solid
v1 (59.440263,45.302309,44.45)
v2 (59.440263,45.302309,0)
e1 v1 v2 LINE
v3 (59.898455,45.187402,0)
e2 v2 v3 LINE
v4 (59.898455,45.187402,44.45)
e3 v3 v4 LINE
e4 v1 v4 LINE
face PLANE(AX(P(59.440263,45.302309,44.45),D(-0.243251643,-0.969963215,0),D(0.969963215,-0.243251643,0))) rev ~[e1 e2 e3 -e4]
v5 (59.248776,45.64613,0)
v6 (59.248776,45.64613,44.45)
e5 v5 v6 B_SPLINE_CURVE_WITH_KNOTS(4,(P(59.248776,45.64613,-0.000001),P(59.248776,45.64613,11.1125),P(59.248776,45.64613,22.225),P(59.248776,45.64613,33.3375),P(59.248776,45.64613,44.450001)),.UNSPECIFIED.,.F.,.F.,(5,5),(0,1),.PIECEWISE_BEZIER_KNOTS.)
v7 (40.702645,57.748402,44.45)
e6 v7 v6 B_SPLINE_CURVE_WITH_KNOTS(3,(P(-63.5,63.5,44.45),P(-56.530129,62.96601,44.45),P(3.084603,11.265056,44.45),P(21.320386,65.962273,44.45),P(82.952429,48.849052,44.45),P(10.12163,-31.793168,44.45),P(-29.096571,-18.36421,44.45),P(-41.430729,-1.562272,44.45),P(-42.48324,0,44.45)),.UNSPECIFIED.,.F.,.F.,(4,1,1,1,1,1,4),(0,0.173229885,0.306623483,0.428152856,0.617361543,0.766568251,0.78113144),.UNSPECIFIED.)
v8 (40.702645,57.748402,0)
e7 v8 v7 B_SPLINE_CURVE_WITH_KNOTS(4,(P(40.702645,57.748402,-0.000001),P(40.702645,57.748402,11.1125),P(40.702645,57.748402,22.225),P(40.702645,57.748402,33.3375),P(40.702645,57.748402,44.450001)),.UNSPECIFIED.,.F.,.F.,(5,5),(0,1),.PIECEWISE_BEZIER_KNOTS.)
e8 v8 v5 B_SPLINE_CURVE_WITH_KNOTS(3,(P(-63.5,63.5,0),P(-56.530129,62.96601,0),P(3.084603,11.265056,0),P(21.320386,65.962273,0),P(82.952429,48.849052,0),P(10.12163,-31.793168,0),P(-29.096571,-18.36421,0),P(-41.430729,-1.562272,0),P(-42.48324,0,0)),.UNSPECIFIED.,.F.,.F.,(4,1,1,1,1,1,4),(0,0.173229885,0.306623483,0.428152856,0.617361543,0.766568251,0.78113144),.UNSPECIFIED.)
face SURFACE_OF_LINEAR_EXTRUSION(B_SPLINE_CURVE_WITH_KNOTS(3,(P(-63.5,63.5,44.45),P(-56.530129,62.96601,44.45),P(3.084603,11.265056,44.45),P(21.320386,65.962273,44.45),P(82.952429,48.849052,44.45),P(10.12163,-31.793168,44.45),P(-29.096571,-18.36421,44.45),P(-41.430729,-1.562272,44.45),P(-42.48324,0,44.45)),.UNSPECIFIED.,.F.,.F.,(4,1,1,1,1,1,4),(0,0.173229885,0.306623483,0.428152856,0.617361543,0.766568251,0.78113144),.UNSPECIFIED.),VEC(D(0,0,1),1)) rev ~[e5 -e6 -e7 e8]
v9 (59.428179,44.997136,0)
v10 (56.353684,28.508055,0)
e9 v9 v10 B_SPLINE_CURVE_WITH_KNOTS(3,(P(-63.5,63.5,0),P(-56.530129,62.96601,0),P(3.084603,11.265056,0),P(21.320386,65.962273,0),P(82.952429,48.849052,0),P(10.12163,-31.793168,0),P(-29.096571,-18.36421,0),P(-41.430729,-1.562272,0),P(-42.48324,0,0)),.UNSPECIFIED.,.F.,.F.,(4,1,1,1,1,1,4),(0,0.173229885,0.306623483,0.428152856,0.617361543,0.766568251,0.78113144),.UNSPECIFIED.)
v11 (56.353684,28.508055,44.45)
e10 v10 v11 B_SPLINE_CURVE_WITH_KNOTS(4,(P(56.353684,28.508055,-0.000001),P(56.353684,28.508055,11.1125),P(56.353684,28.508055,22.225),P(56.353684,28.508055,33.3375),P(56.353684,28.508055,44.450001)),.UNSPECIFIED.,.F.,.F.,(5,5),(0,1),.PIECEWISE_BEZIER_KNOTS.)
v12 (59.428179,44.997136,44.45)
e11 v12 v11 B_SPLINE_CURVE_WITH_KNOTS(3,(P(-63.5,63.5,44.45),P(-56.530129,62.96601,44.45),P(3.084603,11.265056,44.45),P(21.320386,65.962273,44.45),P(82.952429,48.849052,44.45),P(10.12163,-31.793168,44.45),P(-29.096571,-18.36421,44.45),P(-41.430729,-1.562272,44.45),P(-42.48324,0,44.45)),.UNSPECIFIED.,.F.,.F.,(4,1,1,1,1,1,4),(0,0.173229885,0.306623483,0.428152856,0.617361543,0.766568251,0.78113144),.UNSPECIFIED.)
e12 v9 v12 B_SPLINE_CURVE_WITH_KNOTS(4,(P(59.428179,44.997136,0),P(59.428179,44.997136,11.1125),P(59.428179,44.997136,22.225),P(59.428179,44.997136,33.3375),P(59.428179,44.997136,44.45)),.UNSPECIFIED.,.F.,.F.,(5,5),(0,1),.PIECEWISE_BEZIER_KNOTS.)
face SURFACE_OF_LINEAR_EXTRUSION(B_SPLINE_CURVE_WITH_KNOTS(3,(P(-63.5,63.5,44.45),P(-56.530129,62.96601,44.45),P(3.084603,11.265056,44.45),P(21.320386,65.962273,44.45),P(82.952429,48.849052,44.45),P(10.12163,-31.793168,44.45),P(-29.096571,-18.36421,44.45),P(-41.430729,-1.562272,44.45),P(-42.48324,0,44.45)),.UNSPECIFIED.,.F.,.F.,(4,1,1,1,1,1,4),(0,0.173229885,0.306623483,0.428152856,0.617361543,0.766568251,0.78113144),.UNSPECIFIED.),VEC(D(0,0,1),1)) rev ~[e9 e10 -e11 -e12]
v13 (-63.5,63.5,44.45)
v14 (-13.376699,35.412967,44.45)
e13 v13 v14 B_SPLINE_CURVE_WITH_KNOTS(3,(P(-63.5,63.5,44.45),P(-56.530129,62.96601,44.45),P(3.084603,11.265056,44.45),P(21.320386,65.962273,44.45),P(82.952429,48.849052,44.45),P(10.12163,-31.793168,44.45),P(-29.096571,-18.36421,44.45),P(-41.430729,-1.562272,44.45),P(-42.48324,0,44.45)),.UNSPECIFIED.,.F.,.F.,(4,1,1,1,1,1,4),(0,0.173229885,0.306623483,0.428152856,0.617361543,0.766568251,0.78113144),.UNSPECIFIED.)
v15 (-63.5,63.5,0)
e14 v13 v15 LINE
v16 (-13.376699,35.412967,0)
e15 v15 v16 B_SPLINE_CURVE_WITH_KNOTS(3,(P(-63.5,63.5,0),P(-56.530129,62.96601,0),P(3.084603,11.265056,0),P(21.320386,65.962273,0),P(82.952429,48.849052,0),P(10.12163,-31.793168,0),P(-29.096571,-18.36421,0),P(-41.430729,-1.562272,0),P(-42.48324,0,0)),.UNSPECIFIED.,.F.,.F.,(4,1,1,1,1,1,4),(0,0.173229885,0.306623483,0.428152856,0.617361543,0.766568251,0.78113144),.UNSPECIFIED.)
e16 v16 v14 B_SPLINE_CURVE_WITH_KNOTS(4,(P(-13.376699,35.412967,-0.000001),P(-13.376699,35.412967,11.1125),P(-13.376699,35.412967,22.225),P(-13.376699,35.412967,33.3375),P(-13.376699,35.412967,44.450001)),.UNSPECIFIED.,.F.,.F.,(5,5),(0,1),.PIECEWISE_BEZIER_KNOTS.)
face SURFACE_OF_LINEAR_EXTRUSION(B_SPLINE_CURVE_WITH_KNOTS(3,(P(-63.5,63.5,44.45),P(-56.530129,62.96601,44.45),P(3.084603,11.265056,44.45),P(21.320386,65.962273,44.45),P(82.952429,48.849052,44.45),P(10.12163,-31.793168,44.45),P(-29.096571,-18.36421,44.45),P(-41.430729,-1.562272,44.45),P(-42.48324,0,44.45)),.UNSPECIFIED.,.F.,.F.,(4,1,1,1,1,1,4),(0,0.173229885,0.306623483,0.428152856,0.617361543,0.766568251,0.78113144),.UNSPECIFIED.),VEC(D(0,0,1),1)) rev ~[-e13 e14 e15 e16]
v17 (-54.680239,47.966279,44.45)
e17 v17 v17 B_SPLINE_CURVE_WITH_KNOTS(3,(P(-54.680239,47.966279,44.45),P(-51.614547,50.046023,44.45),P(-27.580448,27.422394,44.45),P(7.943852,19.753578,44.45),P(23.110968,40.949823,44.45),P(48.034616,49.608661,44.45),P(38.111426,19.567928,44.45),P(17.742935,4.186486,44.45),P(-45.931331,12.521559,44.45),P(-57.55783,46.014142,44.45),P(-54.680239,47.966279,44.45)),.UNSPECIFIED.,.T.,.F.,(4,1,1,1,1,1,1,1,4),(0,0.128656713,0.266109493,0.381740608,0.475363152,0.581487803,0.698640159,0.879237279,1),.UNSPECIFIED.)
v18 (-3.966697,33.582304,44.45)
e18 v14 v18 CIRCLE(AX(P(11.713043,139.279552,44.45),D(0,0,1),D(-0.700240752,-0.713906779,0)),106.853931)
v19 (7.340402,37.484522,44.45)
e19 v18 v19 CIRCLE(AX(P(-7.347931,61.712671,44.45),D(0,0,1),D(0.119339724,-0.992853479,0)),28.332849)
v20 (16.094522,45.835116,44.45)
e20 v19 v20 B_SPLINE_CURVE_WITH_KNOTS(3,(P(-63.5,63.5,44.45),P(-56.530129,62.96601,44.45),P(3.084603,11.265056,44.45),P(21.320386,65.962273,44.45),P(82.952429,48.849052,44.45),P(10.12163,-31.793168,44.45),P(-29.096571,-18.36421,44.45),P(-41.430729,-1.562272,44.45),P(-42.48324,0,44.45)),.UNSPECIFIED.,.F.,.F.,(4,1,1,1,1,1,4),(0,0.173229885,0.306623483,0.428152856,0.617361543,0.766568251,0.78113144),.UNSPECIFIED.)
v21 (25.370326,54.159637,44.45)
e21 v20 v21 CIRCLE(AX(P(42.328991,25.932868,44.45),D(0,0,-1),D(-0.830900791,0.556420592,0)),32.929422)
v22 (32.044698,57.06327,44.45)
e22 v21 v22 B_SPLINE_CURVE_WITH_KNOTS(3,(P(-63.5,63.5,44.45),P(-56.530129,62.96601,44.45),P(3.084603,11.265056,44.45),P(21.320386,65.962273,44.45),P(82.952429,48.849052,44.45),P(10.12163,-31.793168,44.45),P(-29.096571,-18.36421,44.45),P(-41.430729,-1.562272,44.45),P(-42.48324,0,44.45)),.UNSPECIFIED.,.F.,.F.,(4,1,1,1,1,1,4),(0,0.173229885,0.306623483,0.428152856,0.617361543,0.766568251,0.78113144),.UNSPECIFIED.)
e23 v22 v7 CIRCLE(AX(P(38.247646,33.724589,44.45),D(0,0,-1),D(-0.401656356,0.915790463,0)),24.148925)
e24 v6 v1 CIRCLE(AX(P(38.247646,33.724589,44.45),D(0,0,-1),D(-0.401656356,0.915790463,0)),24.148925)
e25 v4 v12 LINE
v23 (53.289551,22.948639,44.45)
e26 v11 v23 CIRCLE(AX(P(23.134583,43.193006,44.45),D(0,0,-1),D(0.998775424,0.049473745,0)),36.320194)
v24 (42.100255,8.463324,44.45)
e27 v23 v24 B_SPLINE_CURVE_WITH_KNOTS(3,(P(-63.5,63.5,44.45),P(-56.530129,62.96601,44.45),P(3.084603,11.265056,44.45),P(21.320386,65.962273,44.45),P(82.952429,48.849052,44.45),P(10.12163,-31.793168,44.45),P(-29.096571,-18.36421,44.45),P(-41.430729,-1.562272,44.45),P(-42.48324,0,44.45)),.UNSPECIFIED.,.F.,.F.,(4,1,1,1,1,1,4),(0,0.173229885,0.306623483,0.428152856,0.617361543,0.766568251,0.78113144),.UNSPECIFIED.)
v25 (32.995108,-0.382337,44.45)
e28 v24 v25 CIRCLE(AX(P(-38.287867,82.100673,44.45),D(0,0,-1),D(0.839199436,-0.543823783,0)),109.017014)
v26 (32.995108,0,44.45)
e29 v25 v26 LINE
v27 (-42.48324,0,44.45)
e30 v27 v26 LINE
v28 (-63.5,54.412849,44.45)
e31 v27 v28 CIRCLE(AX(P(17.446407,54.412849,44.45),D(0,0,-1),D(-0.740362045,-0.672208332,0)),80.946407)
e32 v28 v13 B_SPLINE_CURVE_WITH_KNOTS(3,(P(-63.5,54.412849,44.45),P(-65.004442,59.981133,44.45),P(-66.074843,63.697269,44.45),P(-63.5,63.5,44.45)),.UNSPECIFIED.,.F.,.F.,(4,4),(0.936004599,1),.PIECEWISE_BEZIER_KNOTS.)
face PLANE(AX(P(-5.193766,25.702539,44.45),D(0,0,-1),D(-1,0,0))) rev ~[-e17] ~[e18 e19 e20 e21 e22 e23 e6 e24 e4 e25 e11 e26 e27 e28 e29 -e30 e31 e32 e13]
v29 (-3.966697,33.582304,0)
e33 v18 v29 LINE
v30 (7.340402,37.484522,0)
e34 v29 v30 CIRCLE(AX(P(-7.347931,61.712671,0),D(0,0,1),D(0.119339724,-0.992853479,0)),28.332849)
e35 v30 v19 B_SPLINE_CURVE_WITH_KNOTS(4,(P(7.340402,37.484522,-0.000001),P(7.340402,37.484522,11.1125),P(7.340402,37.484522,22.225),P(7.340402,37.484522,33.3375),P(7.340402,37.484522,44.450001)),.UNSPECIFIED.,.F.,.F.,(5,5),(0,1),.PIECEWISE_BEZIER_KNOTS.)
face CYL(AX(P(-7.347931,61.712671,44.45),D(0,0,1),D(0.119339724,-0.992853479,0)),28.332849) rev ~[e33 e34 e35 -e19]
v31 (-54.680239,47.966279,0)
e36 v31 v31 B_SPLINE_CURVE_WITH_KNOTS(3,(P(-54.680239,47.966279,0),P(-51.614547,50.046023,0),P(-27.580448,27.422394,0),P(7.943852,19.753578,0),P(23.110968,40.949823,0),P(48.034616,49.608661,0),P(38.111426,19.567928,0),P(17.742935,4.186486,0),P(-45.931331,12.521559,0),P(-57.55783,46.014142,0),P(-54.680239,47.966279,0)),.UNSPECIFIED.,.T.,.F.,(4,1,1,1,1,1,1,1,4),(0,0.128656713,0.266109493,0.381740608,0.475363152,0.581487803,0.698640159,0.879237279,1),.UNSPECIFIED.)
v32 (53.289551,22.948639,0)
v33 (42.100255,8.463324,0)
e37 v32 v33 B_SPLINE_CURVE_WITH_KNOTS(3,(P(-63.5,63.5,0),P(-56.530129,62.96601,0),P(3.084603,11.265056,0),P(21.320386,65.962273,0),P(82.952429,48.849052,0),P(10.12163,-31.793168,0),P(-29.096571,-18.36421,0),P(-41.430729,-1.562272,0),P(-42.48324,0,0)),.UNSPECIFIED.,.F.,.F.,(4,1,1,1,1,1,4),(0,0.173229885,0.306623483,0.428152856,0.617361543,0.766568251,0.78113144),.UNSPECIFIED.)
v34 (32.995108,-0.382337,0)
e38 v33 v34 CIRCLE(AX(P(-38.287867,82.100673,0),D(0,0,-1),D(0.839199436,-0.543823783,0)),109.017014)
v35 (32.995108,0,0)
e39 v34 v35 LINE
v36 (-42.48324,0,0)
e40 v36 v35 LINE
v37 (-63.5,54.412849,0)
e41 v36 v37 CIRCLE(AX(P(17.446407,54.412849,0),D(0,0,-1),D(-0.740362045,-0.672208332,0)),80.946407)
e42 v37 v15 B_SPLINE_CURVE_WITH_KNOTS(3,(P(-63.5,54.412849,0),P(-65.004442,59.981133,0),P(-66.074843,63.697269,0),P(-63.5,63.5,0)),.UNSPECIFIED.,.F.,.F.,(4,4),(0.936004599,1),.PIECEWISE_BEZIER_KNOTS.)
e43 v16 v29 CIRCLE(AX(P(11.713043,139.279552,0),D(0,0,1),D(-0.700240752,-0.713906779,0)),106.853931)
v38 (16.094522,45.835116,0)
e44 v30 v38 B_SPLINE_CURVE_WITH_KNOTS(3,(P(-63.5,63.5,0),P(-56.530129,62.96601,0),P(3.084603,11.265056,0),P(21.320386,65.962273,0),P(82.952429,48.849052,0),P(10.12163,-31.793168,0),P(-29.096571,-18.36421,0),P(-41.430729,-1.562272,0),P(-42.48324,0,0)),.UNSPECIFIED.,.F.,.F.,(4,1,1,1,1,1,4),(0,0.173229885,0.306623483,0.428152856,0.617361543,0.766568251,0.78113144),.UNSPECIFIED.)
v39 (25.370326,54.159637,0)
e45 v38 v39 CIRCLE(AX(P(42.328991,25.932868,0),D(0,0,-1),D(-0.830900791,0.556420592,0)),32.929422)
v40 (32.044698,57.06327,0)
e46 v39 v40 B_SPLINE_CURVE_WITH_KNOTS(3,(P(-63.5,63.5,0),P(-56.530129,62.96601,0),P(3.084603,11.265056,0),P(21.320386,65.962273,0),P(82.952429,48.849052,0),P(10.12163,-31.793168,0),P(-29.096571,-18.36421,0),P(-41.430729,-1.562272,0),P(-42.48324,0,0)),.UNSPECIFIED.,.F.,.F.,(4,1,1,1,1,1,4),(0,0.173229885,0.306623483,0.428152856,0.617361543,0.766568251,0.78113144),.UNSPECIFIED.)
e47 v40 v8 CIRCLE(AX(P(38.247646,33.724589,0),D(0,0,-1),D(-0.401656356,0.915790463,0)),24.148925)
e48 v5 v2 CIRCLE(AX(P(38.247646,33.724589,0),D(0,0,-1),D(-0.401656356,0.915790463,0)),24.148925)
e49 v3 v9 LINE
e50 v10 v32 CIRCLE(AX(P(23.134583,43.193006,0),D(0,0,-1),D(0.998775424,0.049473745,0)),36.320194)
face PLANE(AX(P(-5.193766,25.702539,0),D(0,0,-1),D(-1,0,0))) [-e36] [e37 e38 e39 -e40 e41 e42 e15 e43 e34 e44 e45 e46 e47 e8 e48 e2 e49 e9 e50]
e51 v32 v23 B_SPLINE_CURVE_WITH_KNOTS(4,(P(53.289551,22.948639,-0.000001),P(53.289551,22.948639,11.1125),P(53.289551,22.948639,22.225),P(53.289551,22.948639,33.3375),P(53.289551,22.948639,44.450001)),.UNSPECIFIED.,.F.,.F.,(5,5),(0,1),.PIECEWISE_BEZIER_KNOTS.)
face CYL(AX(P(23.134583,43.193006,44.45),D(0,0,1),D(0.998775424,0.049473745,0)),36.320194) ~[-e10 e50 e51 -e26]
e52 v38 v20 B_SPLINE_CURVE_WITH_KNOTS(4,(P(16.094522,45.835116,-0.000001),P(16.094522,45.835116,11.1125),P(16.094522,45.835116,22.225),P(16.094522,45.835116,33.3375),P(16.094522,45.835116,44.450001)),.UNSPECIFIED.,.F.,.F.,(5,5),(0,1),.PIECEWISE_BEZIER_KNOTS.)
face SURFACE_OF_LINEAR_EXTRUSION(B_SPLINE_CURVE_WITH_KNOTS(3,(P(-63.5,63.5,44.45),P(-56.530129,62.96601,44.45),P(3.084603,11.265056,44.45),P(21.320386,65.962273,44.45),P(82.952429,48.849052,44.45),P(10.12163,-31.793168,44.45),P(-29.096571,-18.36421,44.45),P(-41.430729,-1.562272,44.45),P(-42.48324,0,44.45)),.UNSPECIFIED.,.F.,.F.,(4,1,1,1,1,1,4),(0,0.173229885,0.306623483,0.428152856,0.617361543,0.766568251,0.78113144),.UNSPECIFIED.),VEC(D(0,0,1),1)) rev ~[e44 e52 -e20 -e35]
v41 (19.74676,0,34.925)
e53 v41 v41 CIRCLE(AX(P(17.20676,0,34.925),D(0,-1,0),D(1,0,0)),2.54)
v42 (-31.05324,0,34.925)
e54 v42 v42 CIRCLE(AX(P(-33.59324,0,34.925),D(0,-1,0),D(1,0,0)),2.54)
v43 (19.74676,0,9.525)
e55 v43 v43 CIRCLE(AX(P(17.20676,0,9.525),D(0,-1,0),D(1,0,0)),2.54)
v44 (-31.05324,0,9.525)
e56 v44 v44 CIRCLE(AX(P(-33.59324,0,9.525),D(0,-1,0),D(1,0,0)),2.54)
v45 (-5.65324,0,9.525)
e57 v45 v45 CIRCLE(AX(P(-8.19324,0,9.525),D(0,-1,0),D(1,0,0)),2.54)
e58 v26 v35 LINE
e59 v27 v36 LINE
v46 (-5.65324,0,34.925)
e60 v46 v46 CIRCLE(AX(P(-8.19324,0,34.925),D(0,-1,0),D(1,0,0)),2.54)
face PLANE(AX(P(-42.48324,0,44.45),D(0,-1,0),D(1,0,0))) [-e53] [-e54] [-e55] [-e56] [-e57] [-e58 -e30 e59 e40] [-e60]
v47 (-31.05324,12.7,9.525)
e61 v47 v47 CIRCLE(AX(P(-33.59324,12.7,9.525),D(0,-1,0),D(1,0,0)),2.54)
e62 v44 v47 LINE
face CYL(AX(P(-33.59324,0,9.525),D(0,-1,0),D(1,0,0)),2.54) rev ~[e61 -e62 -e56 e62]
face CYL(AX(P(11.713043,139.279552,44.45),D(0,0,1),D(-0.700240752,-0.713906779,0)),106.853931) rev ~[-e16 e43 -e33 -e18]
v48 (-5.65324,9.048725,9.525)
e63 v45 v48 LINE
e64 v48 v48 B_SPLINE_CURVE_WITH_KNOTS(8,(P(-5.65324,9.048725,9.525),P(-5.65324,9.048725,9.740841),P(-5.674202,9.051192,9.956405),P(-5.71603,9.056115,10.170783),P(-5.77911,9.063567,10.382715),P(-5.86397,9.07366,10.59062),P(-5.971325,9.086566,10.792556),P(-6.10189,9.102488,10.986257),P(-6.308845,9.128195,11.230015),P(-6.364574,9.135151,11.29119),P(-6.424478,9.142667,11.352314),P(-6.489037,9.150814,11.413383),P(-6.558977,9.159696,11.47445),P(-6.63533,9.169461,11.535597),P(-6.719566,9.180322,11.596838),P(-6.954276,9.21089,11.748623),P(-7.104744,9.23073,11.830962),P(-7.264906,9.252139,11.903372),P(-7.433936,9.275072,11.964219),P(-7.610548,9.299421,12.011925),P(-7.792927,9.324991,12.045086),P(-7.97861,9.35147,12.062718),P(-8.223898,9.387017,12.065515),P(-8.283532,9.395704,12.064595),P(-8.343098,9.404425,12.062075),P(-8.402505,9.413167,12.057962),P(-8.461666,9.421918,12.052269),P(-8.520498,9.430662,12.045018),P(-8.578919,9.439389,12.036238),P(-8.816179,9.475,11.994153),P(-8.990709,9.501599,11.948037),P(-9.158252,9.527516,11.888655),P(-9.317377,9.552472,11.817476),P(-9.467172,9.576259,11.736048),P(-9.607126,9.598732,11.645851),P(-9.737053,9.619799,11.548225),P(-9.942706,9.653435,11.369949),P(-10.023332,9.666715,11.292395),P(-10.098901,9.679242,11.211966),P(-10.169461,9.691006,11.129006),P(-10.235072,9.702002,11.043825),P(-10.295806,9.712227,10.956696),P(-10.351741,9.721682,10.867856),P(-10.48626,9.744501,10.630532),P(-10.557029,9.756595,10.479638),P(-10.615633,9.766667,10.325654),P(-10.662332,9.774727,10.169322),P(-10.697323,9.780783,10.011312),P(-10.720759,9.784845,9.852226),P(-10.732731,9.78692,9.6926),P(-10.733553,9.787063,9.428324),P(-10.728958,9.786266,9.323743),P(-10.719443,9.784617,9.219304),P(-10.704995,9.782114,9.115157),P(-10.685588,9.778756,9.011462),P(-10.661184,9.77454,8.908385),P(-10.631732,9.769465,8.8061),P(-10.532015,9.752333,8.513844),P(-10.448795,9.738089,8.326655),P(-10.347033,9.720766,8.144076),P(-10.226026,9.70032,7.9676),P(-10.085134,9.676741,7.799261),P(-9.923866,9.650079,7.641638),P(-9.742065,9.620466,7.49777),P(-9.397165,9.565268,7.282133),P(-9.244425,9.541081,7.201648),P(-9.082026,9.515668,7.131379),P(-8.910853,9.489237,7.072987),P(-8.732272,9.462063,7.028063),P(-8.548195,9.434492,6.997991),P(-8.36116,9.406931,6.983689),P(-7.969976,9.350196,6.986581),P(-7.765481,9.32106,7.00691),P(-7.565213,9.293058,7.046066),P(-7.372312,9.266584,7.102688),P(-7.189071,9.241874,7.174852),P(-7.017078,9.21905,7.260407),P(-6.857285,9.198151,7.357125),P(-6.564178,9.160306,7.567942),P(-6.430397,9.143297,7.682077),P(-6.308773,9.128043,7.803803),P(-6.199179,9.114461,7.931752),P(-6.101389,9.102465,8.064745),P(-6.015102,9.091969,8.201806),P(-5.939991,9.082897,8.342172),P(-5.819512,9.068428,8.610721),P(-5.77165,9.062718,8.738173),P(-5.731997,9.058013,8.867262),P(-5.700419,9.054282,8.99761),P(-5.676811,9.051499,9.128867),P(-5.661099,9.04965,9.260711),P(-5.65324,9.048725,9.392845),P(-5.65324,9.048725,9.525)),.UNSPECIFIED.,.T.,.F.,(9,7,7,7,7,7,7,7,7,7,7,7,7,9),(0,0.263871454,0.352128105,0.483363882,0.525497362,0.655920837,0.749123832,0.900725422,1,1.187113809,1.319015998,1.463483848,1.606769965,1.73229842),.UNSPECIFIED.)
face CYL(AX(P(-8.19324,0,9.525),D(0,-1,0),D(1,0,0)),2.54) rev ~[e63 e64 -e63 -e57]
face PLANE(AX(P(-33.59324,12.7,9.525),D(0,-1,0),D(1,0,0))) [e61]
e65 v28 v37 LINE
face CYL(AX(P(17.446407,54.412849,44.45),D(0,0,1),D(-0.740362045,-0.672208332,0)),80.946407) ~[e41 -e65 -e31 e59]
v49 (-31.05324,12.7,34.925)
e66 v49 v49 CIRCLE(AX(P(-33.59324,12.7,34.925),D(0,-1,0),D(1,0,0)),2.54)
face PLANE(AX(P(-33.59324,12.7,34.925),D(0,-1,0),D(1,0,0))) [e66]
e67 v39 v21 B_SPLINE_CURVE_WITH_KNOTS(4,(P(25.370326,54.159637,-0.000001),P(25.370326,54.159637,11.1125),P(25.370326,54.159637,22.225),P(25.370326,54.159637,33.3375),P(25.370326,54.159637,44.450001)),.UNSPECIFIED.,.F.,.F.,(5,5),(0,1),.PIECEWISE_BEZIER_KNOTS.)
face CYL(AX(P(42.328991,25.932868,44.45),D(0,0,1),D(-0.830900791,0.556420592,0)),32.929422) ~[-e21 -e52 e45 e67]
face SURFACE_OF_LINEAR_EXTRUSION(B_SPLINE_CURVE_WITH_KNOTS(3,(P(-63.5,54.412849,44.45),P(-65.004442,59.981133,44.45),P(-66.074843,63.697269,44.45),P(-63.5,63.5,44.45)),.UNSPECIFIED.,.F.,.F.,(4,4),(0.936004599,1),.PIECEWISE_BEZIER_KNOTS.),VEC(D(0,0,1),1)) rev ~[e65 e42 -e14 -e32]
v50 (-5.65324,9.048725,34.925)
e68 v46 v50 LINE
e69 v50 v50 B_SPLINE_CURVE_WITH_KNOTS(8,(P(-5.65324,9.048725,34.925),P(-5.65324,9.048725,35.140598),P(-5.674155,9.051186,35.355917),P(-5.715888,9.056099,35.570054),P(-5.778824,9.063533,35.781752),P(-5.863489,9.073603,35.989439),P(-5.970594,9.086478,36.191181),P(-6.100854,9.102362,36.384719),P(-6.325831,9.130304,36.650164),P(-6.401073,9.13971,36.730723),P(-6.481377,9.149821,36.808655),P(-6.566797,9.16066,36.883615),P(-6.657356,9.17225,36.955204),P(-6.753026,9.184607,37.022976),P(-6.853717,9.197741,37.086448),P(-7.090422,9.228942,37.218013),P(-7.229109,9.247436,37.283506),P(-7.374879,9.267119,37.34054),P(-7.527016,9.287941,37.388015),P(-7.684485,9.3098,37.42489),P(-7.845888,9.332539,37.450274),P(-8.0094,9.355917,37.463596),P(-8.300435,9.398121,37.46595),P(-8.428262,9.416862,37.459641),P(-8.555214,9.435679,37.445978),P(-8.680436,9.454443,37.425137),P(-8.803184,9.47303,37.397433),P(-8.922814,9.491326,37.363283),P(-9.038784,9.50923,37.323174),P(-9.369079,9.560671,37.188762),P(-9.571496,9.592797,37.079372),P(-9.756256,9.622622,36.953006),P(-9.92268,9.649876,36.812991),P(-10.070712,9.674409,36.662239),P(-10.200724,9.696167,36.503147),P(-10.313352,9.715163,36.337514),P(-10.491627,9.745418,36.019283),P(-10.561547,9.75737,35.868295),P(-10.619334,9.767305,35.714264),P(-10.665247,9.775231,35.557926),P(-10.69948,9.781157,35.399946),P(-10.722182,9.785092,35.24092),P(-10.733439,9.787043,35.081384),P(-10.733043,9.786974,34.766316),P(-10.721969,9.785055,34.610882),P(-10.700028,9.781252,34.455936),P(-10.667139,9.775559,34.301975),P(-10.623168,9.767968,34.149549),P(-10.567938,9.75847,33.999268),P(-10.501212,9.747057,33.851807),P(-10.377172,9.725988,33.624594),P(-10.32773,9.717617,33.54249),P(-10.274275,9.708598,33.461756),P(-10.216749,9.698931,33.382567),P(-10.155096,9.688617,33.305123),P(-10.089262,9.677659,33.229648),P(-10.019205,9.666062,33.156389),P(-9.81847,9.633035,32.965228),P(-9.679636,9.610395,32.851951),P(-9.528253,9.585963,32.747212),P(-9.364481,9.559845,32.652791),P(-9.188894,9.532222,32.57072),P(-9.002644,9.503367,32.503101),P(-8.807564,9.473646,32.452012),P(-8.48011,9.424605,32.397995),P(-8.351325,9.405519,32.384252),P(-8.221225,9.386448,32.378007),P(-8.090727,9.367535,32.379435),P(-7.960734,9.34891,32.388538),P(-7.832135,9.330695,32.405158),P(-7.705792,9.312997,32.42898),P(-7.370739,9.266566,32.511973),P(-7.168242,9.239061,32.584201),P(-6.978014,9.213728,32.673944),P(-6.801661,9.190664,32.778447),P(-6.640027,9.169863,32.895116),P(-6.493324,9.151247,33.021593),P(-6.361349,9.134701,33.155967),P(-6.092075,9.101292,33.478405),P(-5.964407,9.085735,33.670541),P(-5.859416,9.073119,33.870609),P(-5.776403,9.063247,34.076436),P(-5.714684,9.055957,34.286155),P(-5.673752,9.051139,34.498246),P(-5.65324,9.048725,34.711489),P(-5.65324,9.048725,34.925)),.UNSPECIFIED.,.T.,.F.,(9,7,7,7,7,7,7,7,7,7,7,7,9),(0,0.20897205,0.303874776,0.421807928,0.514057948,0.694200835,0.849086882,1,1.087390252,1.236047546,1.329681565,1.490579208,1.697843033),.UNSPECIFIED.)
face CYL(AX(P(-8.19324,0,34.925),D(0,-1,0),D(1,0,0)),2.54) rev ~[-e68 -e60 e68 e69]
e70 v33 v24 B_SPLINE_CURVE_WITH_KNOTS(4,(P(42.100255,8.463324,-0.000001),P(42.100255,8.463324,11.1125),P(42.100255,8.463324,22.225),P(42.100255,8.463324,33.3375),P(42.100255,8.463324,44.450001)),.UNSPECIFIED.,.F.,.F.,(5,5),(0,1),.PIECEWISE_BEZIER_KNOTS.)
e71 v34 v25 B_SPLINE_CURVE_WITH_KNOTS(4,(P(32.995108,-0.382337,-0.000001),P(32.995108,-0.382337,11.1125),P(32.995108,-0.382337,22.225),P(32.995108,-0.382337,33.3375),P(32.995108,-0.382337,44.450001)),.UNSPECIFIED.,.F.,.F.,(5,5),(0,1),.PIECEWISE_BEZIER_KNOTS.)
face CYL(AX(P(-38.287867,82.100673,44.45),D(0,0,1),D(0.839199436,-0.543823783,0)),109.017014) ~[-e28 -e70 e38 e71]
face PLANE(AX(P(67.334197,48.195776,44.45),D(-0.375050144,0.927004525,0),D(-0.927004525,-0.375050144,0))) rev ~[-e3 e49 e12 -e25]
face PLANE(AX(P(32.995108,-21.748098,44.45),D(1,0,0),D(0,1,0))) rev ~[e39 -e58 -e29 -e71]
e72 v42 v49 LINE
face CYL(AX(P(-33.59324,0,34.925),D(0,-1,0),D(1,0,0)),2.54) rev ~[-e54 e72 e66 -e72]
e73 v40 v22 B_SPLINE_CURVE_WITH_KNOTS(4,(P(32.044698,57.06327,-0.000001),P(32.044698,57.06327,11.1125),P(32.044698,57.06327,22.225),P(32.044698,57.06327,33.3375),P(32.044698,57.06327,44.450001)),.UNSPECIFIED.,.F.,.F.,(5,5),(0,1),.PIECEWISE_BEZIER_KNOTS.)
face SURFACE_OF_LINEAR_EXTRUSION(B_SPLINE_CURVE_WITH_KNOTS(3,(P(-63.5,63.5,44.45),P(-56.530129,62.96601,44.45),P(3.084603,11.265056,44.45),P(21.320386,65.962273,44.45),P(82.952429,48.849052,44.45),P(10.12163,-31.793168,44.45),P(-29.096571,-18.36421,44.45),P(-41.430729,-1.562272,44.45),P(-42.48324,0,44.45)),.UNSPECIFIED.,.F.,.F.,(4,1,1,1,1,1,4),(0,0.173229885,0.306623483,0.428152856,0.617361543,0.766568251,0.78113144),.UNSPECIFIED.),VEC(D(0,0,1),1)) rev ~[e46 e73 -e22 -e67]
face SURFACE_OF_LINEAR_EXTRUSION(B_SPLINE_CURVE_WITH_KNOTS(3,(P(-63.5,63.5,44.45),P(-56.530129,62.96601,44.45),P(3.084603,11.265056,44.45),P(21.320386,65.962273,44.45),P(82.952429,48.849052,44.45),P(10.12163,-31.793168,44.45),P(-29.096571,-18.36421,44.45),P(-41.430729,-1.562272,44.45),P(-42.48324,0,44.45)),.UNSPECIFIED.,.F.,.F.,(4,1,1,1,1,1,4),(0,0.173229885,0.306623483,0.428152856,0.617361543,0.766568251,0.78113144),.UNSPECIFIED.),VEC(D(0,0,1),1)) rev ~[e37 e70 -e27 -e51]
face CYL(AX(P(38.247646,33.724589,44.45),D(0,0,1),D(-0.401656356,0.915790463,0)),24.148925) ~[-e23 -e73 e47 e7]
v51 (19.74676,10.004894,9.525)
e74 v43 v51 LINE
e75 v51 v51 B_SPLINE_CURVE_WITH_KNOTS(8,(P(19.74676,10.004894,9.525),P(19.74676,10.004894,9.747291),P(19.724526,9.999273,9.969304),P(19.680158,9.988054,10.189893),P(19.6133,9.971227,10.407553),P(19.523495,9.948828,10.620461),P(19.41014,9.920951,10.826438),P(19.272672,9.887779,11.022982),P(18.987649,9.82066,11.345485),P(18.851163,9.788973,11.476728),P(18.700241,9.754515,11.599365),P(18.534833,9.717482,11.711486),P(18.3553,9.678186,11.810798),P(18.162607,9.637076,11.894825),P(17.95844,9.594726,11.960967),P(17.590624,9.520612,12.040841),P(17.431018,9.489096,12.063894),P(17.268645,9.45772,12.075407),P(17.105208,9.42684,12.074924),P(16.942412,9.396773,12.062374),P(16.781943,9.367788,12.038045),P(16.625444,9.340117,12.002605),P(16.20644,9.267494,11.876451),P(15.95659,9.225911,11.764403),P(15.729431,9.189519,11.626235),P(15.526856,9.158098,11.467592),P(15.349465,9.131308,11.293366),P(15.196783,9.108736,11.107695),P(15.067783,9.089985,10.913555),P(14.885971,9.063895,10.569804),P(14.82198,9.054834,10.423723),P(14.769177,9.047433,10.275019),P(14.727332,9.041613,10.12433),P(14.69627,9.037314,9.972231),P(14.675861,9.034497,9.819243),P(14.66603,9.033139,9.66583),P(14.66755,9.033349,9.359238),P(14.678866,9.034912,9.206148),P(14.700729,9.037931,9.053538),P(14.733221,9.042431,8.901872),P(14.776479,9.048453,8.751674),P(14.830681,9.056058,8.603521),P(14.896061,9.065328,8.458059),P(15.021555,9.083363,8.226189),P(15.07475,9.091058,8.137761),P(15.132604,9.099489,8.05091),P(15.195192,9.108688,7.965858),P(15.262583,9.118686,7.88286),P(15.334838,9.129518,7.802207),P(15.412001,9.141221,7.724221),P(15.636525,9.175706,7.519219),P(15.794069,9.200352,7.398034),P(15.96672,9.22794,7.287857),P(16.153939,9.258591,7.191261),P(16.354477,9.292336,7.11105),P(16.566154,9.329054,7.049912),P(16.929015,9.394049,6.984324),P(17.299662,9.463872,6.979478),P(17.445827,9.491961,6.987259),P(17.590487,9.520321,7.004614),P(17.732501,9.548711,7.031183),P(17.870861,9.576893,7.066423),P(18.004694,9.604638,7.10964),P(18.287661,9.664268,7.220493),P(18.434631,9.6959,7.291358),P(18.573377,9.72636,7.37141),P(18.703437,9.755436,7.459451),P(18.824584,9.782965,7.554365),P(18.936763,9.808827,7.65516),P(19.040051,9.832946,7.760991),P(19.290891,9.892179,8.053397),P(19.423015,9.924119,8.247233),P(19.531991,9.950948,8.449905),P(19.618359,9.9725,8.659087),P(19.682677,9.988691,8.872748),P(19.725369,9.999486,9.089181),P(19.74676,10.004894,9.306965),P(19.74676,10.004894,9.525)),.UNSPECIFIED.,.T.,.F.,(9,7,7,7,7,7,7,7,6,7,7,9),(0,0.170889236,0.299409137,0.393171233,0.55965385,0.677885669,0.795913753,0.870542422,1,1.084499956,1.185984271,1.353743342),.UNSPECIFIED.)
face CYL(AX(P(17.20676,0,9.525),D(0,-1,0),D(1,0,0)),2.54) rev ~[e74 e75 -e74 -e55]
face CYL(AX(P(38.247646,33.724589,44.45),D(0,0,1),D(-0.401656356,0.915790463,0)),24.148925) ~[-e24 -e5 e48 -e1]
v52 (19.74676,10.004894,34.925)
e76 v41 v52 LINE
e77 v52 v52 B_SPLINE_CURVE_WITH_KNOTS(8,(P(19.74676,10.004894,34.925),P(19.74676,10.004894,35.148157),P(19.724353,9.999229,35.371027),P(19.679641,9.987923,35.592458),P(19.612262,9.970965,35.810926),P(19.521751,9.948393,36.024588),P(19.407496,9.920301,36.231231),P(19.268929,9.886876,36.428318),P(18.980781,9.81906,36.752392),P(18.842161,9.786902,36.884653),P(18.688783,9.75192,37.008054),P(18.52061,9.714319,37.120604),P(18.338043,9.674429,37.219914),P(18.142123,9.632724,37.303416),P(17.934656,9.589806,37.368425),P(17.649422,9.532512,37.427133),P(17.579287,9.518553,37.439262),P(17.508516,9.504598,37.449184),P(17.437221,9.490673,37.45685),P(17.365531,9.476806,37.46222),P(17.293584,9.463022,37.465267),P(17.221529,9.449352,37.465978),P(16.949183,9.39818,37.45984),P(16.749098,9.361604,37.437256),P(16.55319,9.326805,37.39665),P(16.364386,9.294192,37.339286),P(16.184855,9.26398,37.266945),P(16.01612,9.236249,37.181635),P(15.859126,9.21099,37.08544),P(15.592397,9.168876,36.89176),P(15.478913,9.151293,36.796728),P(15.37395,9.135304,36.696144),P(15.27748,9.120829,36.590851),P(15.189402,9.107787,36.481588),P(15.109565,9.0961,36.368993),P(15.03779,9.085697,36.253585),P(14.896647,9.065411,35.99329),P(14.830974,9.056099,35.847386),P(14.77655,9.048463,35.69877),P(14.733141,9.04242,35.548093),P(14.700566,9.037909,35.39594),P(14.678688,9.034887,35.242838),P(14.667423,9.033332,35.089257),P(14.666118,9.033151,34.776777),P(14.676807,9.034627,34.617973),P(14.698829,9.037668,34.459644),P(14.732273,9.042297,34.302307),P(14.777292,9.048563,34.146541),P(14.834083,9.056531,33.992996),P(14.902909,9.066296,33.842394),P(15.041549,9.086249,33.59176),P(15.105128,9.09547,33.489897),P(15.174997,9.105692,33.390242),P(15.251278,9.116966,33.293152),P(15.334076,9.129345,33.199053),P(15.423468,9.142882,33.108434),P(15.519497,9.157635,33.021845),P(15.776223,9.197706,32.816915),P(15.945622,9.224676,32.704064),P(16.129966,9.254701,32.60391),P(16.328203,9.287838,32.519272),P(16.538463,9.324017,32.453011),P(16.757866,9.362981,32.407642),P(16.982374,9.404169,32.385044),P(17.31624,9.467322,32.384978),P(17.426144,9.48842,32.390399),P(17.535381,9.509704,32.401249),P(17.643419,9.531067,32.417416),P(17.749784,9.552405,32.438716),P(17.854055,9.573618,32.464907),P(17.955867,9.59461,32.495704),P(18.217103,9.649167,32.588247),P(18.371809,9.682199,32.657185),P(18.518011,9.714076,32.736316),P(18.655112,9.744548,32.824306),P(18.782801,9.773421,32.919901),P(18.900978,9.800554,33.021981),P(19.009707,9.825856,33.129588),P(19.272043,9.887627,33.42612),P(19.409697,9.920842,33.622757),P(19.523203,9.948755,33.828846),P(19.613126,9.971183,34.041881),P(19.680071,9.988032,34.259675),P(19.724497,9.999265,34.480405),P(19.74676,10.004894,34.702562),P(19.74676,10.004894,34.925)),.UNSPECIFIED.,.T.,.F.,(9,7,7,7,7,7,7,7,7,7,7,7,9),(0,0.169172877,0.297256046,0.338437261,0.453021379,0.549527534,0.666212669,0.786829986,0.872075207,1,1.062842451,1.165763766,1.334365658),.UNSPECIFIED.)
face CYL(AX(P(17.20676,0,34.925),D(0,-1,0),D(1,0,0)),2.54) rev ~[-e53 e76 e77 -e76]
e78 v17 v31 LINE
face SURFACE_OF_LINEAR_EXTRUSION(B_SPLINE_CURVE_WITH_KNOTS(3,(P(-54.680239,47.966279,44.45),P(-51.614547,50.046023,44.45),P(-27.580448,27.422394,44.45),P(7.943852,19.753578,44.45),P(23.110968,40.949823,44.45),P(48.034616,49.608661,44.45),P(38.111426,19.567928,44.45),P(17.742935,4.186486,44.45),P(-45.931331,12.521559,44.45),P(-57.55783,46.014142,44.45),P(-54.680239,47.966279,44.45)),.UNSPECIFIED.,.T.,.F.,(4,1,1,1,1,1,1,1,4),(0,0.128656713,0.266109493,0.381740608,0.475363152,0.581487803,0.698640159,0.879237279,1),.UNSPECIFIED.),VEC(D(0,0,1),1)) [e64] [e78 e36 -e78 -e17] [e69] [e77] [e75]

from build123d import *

# Parameters (mm, degrees)
F0_W      = 127
F0_H      = 127
F1_DEPTH  = 44.45
F3_W      = 5.52829355
F3_H      = 29.727132991
F3_W_2    = 15.5509337783
F3_H_2    = 31.797057949
F3_W_3    = 16.7360811029
F3_H_3    = 5.0730407238
F3_W_4    = 12.5154256821
F3_H_4    = 7.4998177588
F4_DEPTH  = 44.45
F6_DEPTH  = 44.45
F8_DEPTH  = 44.45
F10_DEPTH = 44.45
F11_DEPTH = 44.45
F13_DEPTH = 44.45
F14_W     = 40.5534765481
F14_H     = 44.45
F15_DEPTH = 25.4
F16_W     = 51.4885028824
F16_H     = 44.45
F17_DEPTH = 0.165514648
F18_W     = 20.4539634287
F18_H     = 44.45
F19_DEPTH = 0.5054324865
F20_W     = 63.3779155047
F20_H     = 44.45
F21_DEPTH = 0.1083666682
F22_DEPTH = 44.45
F24_DEPTH = 44.45
F25_W     = 75.4783482299
F25_H     = 21.748097633
F26_DEPTH = 44.45
F27_R     = 2.54
F28_DEPTH = 12.7
F30_DEPTH = 44.45


with BuildPart() as f1:
    # F0 (on Top) → F1 (new body)
    with BuildSketch(Plane.XY):
        Rectangle(F0_W, F0_H)
    extrude(amount=F1_DEPTH)

    # F3 (on face) → F4 (cut, through all)
    with BuildSketch(Plane.XY.offset(44.45)):
        Polygon((-42.7088961005, -20.6194780767), (-42.7088961005, 0), (-57.5702860951, 0), (-63.0985796452, 0), (-63.6439546943, 0), (-63.6439546943, -63.8658776879), (-42.7088961005, -63.8658776879), align=None)
        with Locations((-60.3344328701, 14.8635664955)):
            Rectangle(F3_W, F3_H)
        Polygon((47.7073714137, -20.6194780767), (-42.7088961005, -20.6194780767), (-42.7088961005, -63.8658776879), (63.258305192, -63.8658776879), (63.258305192, -24.8609110713), (63.258305192, -20.6194780767), align=None)
        with Locations((55.4828383029, -4.7209491022)):
            Rectangle(F3_W_2, F3_H_2)
        Polygon((15.835031867, 62.7080500126), (-35.6965474784, 62.7080500126), (-35.6965474784, 49.4633540511), (-20.397156477, 49.4633540511), (8.7539097294, 49.4633540511), (15.835031867, 49.4633540511), align=None)
        Polygon((8.7539097294, 49.4633540511), (-20.397156477, 49.4633540511), (-20.397156477, 42.0814976096), (-13.3289527148, 42.0814976096), (3.4071283881, 42.0814976096), (8.7539097294, 42.0814976096), align=None)
        with Locations((-4.9609121634, 39.5449772477)):
            Rectangle(F3_W_3, F3_H_3)
        with Locations((57.0145174861, 59.6473719925)):
            Rectangle(F3_W_4, F3_H_4)
    extrude(amount=-F4_DEPTH, mode=Mode.SUBTRACT)

    # F5 (on face) → F6 (cut, through all)
    with BuildSketch(Plane.XY.offset(44.45)):
        with BuildLine():
            ThreePointArc((-42.1748310328, 0), (-55.8025308374, 26.5772535751), (-63.3916333318, 55.4644502699))
            Line((-63.3916333318, 55.4644502699), (-63.3916333318, 0))
            Line((-63.3916333318, 0), (-42.1748310328, 0))
        make_face()
    extrude(amount=-F6_DEPTH, mode=Mode.SUBTRACT)

    # F7 (on face) → F8 (cut)
    with BuildSketch(Plane.XY.offset(44.45)):
        with BuildLine():
            ThreePointArc((-27.7672337737, -14.7277772986), (-34.772809099, -9.5105149668), (-40.4422940209, -2.8656031845))
            add(Edge.make_bspline(
                [(-40.4422940209, -2.8656031845), (-41.0425985075, -2.0697804555), (-41.6295465783, -1.2511429317), (-42.203463614, -0.4121370856)],
                knots=[0.7719634634, 0.7719634634, 0.7719634634, 0.7719634634, 0.7798458357, 0.7798458357, 0.7798458357, 0.7798458357], degree=3))
            Line((-42.203463614, -0.4121370856), (-42.203463614, -20.4539634287))
            Line((-42.203463614, -20.4539634287), (9.0681575239, -20.4539634287))
            Line((9.0681575239, -20.4539634287), (8.7691887717, -16.2410980862))
            add(Edge.make_bspline(
                [(8.7691887717, -16.2410980862), (8.5055559046, -16.3529711172), (8.2424805859, -16.4623264472), (7.9799670389, -16.5691767183)],
                knots=[0.6174011323, 0.6174011323, 0.6174011323, 0.6174011323, 0.6193995077, 0.6193995077, 0.6193995077, 0.6193995077], degree=3))
            ThreePointArc((7.9799670389, -16.5691767183), (1.6850007311, -18.7915432844), (-4.8966563137, -19.9083711648))
            add(Edge.make_bspline(
                [(-4.8966563137, -19.9083711648), (-13.3522734014, -20.7935789279), (-21.0357023958, -18.8874004708), (-27.7672337737, -14.7277772986)],
                knots=[0.6533615409, 0.6533615409, 0.6533615409, 0.6533615409, 0.7231284421, 0.7231284421, 0.7231284421, 0.7231284421], degree=3))
        make_face()
    extrude(amount=-F8_DEPTH, mode=Mode.SUBTRACT)

    # F9 (on face) → F10 (join, through all)
    with BuildSketch(Plane.XY.offset(44.45)):
        with BuildLine():
            ThreePointArc((53.1991496682, 22.8146277368), (33.6878318767, 0.2214438257), (8.7796067819, -16.2322428077))
            Line((8.7796067819, -16.2322428077), (8.7796067819, -20.729560405))
            Line((8.7796067819, -20.729560405), (67.3341974616, -23.1123883277))
            Line((67.3341974616, -23.1123883277), (67.3341974616, 48.1957755983))
            Line((67.3341974616, 48.1957755983), (59.4103001058, 44.9899025261))
            ThreePointArc((59.4103001058, 44.9899025261), (58.1087736986, 33.3969627769), (53.1991496682, 22.8146277368))
        make_face()
    extrude(amount=-F10_DEPTH)

    # F9 (on face) → F11 (cut)
    with BuildSketch(Plane.XY.offset(44.45)):
        with BuildLine():
            ThreePointArc((53.1991496682, 22.8146277368), (33.6878318767, 0.2214438257), (8.7796067819, -16.2322428077))
            Line((8.7796067819, -16.2322428077), (8.7796067819, -20.729560405))
            Line((8.7796067819, -20.729560405), (67.3341974616, -23.1123883277))
            Line((67.3341974616, -23.1123883277), (67.3341974616, 48.1957755983))
            Line((67.3341974616, 48.1957755983), (59.4103001058, 44.9899025261))
            ThreePointArc((59.4103001058, 44.9899025261), (58.1087736986, 33.3969627769), (53.1991496682, 22.8146277368))
        make_face()
    extrude(amount=-F11_DEPTH, mode=Mode.SUBTRACT)

    # F12 (on face) → F13 (cut)
    with BuildSketch(Plane.XY.offset(44.45)):
        with BuildLine():
            ThreePointArc((28.5480767488, 55.8399446309), (46.0439897256, 56.5803897157), (59.4402626157, 45.3023090959))
            Line((59.4402626157, 45.3023090959), (65.0680884719, 43.8909381628))
            Line((65.0680884719, 43.8909381628), (79.9444690347, 67.8006857634))
            Line((79.9444690347, 67.8006857634), (-66.2609507172, 66.0860144647))
            Line((-66.2609507172, 66.0860144647), (-63.1104335189, 62.9958063364))
            ThreePointArc((-63.1104335189, 62.9958063364), (-35.8684298989, 43.6042367441), (-3.9666965604, 33.582303673))
            ThreePointArc((-3.9666965604, 33.582303673), (6.5647988631, 37.0309720517), (14.9679081514, 44.255476445))
            ThreePointArc((14.9679081514, 44.255476445), (20.9580771779, 50.9854302577), (28.5480767488, 55.8399446309))
        make_face()
    extrude(amount=-F13_DEPTH, mode=Mode.SUBTRACT)

    # F14 (on face) → F15 (cut)
    with BuildSketch(Plane(origin=(63.258305192, 0, 0), x_dir=(0, -1, 0), z_dir=(-1, 0, 0))):
        with Locations((43.223261726, 22.225)):
            Rectangle(F14_W, F14_H)
    extrude(amount=-F15_DEPTH, mode=Mode.SUBTRACT)

    # F16 (on face) → F17 (cut, through all)
    with BuildSketch(Plane.XZ.offset(20.6194780767)):
        with Locations((-16.9646446593, 22.225)):
            Rectangle(F16_W, F16_H)
    extrude(amount=-F17_DEPTH, mode=Mode.SUBTRACT)

    # F18 (on face) → F19 (cut, through all)
    with BuildSketch(Plane(origin=(-42.7088961005, 0, 0), x_dir=(0, -1, 0), z_dir=(-1, 0, 0))):
        with Locations((10.2269817144, 22.225)):
            Rectangle(F18_W, F18_H)
    extrude(amount=-F19_DEPTH, mode=Mode.SUBTRACT)

    # F20 (on face) → F21 (cut, through all)
    with BuildSketch(Plane(origin=(-63.5, 0, 0), x_dir=(0, -1, 0), z_dir=(-1, 0, 0))):
        with Locations((-31.6889577524, 22.225)):
            Rectangle(F20_W, F20_H)
    extrude(amount=-F21_DEPTH, mode=Mode.SUBTRACT)

    # F2 (on face) → F22 (join)
    with BuildSketch(Plane.XY.offset(44.45)):
        with BuildLine():
            add(Edge.make_bspline(
                [(-63.5, 63.5), (-56.5301288519, 62.9660103461), (3.0846031043, 11.2650555358), (21.3203858799, 65.9622727195), (82.9524294609, 48.8490523279), (10.1216295014, -31.7931676724), (-29.0965706168, -18.3642097281), (-41.4307292783, -1.5622723401), (-42.4832404343, 0)],
                knots=[0, 0, 0, 0, 0.1732298849, 0.3066234834, 0.4281528556, 0.6173615434, 0.7665682512, 0.7811314402, 0.7811314402, 0.7811314402, 0.7811314402], degree=3))
            add(Edge.make_bspline(
                [(-63.5, 54.4128492475), (-65.004442094, 59.9811333867), (-66.0748426777, 63.6972689769), (-63.5, 63.5)],
                knots=[0.9360045988, 0.9360045988, 0.9360045988, 0.9360045988, 1, 1, 1, 1], degree=3))
            add(Edge.make_bspline(
                [(-42.4832404343, 0), (-53.6762372227, 16.6140845027), (-59.8591493369, 40.9372285625), (-63.5, 54.4128492475)],
                knots=[0.7811314402, 0.7811314402, 0.7811314402, 0.7811314402, 0.9360045988, 0.9360045988, 0.9360045988, 0.9360045988], degree=3))
        make_face()
        with BuildLine():
            Line((-63.5, 0), (-42.4832404343, 0))
            add(Edge.make_bspline(
                [(-42.4832404343, 0), (-53.6762372227, 16.6140845027), (-59.8591493369, 40.9372285625), (-63.5, 54.4128492475)],
                knots=[0.7811314402, 0.7811314402, 0.7811314402, 0.7811314402, 0.9360045988, 0.9360045988, 0.9360045988, 0.9360045988], degree=3))
            Line((-63.5, 54.4128492475), (-63.5, 0))
        make_face()
    extrude(amount=-F22_DEPTH)

    # F23 (on face) → F24 (cut)
    with BuildSketch(Plane.XY.offset(44.45)):
        with BuildLine():
            ThreePointArc((-42.4832404343, 0), (-58.0632295995, 25.2475344632), (-63.5, 54.4128492475))
            Line((-63.5, 54.4128492475), (-63.5, 0))
            Line((-63.5, 0), (-42.4832404343, 0))
        make_face()
    extrude(amount=-F24_DEPTH, mode=Mode.SUBTRACT)

    # F25 (on face) → F26 (cut)
    with BuildSketch(Plane.XY.offset(44.45)):
        with Locations((-4.7440663193, -10.8740488165)):
            Rectangle(F25_W, F25_H)
    extrude(amount=-F26_DEPTH, mode=Mode.SUBTRACT)

    # F27 (on face) → F28 (cut)
    with BuildSketch(Plane.XZ):
        with Locations((-33.5932404343, 34.925)):
            Circle(F27_R)
        with Locations((-33.5932404343, 9.525)):
            Circle(F27_R)
        with Locations((-8.1932404343, 34.925)):
            Circle(F27_R)
        with Locations((-8.1932404343, 9.525)):
            Circle(F27_R)
        with Locations((17.2067595657, 34.925)):
            Circle(F27_R)
        with Locations((17.2067595657, 9.525)):
            Circle(F27_R)
    extrude(amount=-F28_DEPTH, mode=Mode.SUBTRACT)

    # F29 (on face) → F30 (cut, through all)
    with BuildSketch(Plane.XY.offset(44.45)):
        with BuildLine():
            add(Edge.make_bspline(
                [(-54.6802394092, 47.9662790895), (-51.6145466363, 50.0460226855), (-27.5804482165, 27.42239441), (7.9438522494, 19.7535780522), (23.1109683336, 40.9498229071), (48.0346161993, 49.6086612554), (38.1114256694, 19.5679278095), (17.7429351354, 4.1864856123), (-45.9313308916, 12.5215588165), (-57.5578304123, 46.0141423608), (-54.6802394092, 47.9662790895)],
                knots=[0, 0, 0, 0, 0.128656713, 0.2661094932, 0.3817406077, 0.4753631519, 0.5814878035, 0.6986401594, 0.8792372794, 1, 1, 1, 1], degree=3))
        make_face()
    extrude(amount=-F30_DEPTH, mode=Mode.SUBTRACT)


solid = f1.part
